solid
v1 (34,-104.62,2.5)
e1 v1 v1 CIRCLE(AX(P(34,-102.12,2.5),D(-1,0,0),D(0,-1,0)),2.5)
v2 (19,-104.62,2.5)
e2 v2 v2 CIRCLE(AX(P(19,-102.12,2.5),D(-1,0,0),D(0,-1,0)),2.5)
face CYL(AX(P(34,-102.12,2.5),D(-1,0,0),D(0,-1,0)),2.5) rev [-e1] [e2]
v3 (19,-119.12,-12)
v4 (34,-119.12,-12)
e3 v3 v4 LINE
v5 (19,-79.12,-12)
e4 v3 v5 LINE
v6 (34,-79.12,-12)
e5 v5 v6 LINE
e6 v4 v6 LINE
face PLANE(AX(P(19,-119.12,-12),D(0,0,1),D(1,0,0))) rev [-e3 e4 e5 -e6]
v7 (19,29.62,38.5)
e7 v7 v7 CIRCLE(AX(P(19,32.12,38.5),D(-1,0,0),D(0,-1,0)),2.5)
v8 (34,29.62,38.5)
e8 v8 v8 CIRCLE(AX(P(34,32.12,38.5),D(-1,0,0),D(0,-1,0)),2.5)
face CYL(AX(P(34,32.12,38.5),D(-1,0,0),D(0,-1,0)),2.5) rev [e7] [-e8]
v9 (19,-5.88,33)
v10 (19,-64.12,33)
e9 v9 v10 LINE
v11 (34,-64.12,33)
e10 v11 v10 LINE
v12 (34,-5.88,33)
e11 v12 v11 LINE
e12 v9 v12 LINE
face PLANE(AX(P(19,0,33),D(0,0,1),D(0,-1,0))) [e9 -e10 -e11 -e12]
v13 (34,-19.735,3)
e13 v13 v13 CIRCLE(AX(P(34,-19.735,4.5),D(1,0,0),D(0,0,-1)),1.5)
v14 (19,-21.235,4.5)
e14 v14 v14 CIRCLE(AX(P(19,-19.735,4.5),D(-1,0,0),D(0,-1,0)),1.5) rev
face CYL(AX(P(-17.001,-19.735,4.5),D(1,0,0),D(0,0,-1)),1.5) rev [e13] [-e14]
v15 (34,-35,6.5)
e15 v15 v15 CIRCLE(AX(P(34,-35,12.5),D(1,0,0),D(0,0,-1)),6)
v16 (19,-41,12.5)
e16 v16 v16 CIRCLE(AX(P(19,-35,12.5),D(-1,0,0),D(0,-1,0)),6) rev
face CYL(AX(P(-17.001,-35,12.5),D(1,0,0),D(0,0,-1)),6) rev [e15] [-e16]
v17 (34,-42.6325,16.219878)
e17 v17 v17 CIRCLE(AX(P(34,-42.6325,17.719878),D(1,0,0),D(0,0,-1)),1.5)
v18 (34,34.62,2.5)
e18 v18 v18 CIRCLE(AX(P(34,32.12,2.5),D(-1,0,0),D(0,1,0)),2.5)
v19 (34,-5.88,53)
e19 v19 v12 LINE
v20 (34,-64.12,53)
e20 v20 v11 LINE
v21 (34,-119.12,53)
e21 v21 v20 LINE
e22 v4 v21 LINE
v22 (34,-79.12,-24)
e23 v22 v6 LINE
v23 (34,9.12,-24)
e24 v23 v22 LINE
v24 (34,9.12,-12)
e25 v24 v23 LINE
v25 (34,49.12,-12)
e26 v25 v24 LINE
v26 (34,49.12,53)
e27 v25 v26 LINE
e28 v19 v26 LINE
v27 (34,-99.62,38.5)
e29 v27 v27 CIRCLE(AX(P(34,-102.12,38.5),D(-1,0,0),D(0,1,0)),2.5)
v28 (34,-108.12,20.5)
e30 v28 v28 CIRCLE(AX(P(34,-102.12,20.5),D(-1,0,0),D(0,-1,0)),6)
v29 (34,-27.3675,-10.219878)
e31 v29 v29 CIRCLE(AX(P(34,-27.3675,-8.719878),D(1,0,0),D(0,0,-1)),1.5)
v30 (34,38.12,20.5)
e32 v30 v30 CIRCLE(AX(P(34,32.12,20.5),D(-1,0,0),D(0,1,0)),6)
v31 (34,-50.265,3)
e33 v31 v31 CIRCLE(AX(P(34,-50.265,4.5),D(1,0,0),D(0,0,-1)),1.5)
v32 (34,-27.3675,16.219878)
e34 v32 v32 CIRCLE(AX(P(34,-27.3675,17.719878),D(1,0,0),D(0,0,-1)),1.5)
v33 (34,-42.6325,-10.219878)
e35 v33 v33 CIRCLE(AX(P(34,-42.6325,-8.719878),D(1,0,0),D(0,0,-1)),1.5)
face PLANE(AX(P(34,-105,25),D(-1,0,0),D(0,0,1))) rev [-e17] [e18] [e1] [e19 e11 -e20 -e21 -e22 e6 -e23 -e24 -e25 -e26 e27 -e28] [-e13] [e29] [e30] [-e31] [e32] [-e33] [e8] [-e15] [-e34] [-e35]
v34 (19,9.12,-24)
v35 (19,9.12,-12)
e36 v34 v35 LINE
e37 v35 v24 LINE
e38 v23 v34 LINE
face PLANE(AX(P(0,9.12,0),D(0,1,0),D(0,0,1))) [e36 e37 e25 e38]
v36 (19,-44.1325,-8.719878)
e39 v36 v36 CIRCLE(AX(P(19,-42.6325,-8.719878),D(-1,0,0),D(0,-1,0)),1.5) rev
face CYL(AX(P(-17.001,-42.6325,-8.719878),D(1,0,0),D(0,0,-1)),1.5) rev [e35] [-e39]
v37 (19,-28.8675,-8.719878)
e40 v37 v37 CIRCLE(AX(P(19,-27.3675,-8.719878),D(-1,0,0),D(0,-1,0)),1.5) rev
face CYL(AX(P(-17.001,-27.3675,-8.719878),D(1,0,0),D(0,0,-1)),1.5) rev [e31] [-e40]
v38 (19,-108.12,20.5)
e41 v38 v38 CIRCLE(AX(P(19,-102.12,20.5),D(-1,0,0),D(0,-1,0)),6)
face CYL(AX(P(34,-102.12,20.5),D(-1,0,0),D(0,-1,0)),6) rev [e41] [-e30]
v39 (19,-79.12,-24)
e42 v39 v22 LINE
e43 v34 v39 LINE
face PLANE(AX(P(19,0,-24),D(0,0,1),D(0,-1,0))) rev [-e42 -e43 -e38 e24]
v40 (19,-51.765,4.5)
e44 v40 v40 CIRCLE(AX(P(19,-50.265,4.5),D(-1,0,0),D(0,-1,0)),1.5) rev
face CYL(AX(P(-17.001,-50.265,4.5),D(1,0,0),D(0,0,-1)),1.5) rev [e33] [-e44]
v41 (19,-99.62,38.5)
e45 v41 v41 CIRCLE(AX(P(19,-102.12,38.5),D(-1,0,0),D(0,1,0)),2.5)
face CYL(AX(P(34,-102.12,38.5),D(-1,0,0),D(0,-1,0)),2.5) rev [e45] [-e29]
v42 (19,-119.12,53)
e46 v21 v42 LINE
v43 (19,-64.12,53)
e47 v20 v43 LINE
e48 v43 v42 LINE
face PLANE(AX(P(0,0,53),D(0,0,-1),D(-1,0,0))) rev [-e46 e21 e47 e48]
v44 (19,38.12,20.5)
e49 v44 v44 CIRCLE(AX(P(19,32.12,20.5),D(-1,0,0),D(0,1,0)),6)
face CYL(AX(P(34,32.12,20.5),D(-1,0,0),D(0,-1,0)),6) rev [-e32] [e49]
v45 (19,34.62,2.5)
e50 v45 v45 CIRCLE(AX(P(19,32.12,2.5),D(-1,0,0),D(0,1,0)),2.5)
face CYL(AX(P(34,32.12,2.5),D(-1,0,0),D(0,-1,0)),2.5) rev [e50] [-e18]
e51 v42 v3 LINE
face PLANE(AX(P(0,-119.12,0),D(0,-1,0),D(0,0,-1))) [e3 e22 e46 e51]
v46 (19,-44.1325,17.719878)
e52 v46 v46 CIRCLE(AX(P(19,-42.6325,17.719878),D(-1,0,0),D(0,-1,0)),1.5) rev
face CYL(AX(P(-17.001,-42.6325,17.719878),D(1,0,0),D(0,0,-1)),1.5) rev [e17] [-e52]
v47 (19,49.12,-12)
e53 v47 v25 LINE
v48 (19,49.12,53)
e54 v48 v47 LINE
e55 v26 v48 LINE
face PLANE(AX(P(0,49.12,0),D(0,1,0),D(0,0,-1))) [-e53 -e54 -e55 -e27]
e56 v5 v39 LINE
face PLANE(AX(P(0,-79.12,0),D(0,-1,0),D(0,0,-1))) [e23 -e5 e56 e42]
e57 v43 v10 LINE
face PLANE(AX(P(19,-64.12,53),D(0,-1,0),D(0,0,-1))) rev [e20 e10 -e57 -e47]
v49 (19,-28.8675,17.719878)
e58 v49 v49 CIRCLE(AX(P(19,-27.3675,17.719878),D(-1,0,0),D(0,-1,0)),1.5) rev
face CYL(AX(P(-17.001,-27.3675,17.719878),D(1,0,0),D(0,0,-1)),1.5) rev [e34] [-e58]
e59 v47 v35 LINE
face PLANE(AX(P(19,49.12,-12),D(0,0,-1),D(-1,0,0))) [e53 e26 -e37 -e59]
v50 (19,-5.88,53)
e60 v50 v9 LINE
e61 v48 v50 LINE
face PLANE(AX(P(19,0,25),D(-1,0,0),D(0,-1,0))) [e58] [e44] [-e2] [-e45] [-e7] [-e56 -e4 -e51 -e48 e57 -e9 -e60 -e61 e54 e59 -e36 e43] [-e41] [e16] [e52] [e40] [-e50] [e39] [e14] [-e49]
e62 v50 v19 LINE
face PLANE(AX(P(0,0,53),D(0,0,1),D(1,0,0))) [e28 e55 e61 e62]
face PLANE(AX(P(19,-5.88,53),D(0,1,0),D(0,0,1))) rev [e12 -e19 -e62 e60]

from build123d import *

# Parameters (mm, degrees)
STOCK_MOUNT_START                              = 19
STOCK_MOUNT_FOR_MOTOR_IN_THE_PLATYFO_2_W       = 50
STOCK_MOUNT_FOR_MOTOR_IN_THE_PLATYFO_2_H       = 57
STOCK_MOUNT_FOR_MOTOR_IN_THE_PLATYFO_2_R       = 1.5
STOCK_MOUNT_FOR_MOTOR_IN_THE_PLATYFO_2_R_2     = 6
STOCK_MOUNT_FOR_MOTOR_IN_THE_PLATYFORM_M_DEPTH = 15
SKETCH2_W                                      = 15
SKETCH2_H                                      = 57
BOSS_EXTRUDE1_DEPTH                            = 19.12
SKETCH3_W                                      = 15
SKETCH3_H                                      = 57
BOSS_EXTRUDE2_DEPTH                            = 19.12
SKETCH4_W                                      = 15
SKETCH4_H                                      = 15
BOSS_EXTRUDE3_DEPTH                            = 20
SKETCH10_W                                     = 15
SKETCH10_H                                     = 65
BOSS_EXTRUDE6_DEPTH                            = 40
SKETCH11_R                                     = 6
SKETCH11_R_2                                   = 2.5
CUT_EXTRUDE2_DEPTH                             = 132.238616268


# Read off the part's stored shape, not the designer's step: Stock-mount for motor in the platyform mechanism-1
with BuildPart() as part:
    # Stock-mount for motor in the platyfo 2 → Stock-mount for motor in the platyform mechanism-1 (new body)
    with BuildSketch(Plane.YZ.offset(STOCK_MOUNT_START)):
        with Locations((-35, 4.5)):
            Rectangle(STOCK_MOUNT_FOR_MOTOR_IN_THE_PLATYFO_2_W, STOCK_MOUNT_FOR_MOTOR_IN_THE_PLATYFO_2_H)
        with Locations((-42.6325, -8.719877789)):
            Circle(STOCK_MOUNT_FOR_MOTOR_IN_THE_PLATYFO_2_R, mode=Mode.SUBTRACT)
        with Locations((-27.3675, -8.719877789)):
            Circle(STOCK_MOUNT_FOR_MOTOR_IN_THE_PLATYFO_2_R, mode=Mode.SUBTRACT)
        with Locations((-50.265, 4.5)):
            Circle(STOCK_MOUNT_FOR_MOTOR_IN_THE_PLATYFO_2_R, mode=Mode.SUBTRACT)
        with Locations((-42.6325, 17.719877789)):
            Circle(STOCK_MOUNT_FOR_MOTOR_IN_THE_PLATYFO_2_R, mode=Mode.SUBTRACT)
        with Locations((-35, 12.5)):
            Circle(STOCK_MOUNT_FOR_MOTOR_IN_THE_PLATYFO_2_R_2, mode=Mode.SUBTRACT)
        with Locations((-27.3675, 17.719877789)):
            Circle(STOCK_MOUNT_FOR_MOTOR_IN_THE_PLATYFO_2_R, mode=Mode.SUBTRACT)
        with Locations((-19.735, 4.5)):
            Circle(STOCK_MOUNT_FOR_MOTOR_IN_THE_PLATYFO_2_R, mode=Mode.SUBTRACT)
    extrude(amount=STOCK_MOUNT_FOR_MOTOR_IN_THE_PLATYFORM_M_DEPTH)

    # Sketch2 → Boss-Extrude1 (add)
    with BuildSketch(Plane.XZ.offset(60)):
        with Locations((26.5, 4.5)):
            Rectangle(SKETCH2_W, SKETCH2_H)
    extrude(amount=BOSS_EXTRUDE1_DEPTH)

    # Sketch3 → Boss-Extrude2 (add)
    with BuildSketch(Plane(origin=(0, -10, 0), x_dir=(1, 0, 0), z_dir=(0, 1, 0))):
        with Locations((26.5, -4.5)):
            Rectangle(SKETCH3_W, SKETCH3_H)
    extrude(amount=BOSS_EXTRUDE2_DEPTH)

    # Sketch4 → Boss-Extrude3 (add)
    with BuildSketch(Plane.XY.offset(33)):
        with Locations((26.5, 1.62)):
            Rectangle(SKETCH4_W, SKETCH4_H)
        with Locations((26.5, -71.62)):
            Rectangle(SKETCH4_W, SKETCH4_H)
    extrude(amount=BOSS_EXTRUDE3_DEPTH)

    # Sketch10 → Boss-Extrude6 (add)
    with BuildSketch(Plane(origin=(0, -79.12, 0), x_dir=(-1, 0, 0), z_dir=(0, -1, 0))):
        with Locations((-26.5, -20.5)):
            Rectangle(SKETCH10_W, SKETCH10_H)
    boss_extrude6 = extrude(amount=BOSS_EXTRUDE6_DEPTH)

    # Mirror1: Boss-Extrude6 across plane
    add(boss_extrude6.mirror(Plane.ZX.offset(-35)))

    # Sketch11 → Cut-Extrude2 (cut, through all)
    with BuildSketch(Plane.ZY.offset(-19)):
        with Locations(Location((20.5, -102.12, 0), (0, 0, 270))):
            Circle(SKETCH11_R)
        with Locations(Location((2.5, -102.12, 0), (0, 0, 270))):
            Circle(SKETCH11_R_2)
        with Locations(Location((38.5, -102.12, 0), (0, 0, 90))):
            Circle(SKETCH11_R_2)
        with Locations(Location((38.5, 32.12, 0), (0, 0, 270))):
            Circle(SKETCH11_R_2)
        with Locations(Location((20.5, 32.12, 0), (0, 0, 90))):
            Circle(SKETCH11_R)
        with Locations(Location((2.5, 32.12, 0), (0, 0, 90))):
            Circle(SKETCH11_R_2)
    extrude(amount=-CUT_EXTRUDE2_DEPTH, mode=Mode.SUBTRACT)


solid = part.part
